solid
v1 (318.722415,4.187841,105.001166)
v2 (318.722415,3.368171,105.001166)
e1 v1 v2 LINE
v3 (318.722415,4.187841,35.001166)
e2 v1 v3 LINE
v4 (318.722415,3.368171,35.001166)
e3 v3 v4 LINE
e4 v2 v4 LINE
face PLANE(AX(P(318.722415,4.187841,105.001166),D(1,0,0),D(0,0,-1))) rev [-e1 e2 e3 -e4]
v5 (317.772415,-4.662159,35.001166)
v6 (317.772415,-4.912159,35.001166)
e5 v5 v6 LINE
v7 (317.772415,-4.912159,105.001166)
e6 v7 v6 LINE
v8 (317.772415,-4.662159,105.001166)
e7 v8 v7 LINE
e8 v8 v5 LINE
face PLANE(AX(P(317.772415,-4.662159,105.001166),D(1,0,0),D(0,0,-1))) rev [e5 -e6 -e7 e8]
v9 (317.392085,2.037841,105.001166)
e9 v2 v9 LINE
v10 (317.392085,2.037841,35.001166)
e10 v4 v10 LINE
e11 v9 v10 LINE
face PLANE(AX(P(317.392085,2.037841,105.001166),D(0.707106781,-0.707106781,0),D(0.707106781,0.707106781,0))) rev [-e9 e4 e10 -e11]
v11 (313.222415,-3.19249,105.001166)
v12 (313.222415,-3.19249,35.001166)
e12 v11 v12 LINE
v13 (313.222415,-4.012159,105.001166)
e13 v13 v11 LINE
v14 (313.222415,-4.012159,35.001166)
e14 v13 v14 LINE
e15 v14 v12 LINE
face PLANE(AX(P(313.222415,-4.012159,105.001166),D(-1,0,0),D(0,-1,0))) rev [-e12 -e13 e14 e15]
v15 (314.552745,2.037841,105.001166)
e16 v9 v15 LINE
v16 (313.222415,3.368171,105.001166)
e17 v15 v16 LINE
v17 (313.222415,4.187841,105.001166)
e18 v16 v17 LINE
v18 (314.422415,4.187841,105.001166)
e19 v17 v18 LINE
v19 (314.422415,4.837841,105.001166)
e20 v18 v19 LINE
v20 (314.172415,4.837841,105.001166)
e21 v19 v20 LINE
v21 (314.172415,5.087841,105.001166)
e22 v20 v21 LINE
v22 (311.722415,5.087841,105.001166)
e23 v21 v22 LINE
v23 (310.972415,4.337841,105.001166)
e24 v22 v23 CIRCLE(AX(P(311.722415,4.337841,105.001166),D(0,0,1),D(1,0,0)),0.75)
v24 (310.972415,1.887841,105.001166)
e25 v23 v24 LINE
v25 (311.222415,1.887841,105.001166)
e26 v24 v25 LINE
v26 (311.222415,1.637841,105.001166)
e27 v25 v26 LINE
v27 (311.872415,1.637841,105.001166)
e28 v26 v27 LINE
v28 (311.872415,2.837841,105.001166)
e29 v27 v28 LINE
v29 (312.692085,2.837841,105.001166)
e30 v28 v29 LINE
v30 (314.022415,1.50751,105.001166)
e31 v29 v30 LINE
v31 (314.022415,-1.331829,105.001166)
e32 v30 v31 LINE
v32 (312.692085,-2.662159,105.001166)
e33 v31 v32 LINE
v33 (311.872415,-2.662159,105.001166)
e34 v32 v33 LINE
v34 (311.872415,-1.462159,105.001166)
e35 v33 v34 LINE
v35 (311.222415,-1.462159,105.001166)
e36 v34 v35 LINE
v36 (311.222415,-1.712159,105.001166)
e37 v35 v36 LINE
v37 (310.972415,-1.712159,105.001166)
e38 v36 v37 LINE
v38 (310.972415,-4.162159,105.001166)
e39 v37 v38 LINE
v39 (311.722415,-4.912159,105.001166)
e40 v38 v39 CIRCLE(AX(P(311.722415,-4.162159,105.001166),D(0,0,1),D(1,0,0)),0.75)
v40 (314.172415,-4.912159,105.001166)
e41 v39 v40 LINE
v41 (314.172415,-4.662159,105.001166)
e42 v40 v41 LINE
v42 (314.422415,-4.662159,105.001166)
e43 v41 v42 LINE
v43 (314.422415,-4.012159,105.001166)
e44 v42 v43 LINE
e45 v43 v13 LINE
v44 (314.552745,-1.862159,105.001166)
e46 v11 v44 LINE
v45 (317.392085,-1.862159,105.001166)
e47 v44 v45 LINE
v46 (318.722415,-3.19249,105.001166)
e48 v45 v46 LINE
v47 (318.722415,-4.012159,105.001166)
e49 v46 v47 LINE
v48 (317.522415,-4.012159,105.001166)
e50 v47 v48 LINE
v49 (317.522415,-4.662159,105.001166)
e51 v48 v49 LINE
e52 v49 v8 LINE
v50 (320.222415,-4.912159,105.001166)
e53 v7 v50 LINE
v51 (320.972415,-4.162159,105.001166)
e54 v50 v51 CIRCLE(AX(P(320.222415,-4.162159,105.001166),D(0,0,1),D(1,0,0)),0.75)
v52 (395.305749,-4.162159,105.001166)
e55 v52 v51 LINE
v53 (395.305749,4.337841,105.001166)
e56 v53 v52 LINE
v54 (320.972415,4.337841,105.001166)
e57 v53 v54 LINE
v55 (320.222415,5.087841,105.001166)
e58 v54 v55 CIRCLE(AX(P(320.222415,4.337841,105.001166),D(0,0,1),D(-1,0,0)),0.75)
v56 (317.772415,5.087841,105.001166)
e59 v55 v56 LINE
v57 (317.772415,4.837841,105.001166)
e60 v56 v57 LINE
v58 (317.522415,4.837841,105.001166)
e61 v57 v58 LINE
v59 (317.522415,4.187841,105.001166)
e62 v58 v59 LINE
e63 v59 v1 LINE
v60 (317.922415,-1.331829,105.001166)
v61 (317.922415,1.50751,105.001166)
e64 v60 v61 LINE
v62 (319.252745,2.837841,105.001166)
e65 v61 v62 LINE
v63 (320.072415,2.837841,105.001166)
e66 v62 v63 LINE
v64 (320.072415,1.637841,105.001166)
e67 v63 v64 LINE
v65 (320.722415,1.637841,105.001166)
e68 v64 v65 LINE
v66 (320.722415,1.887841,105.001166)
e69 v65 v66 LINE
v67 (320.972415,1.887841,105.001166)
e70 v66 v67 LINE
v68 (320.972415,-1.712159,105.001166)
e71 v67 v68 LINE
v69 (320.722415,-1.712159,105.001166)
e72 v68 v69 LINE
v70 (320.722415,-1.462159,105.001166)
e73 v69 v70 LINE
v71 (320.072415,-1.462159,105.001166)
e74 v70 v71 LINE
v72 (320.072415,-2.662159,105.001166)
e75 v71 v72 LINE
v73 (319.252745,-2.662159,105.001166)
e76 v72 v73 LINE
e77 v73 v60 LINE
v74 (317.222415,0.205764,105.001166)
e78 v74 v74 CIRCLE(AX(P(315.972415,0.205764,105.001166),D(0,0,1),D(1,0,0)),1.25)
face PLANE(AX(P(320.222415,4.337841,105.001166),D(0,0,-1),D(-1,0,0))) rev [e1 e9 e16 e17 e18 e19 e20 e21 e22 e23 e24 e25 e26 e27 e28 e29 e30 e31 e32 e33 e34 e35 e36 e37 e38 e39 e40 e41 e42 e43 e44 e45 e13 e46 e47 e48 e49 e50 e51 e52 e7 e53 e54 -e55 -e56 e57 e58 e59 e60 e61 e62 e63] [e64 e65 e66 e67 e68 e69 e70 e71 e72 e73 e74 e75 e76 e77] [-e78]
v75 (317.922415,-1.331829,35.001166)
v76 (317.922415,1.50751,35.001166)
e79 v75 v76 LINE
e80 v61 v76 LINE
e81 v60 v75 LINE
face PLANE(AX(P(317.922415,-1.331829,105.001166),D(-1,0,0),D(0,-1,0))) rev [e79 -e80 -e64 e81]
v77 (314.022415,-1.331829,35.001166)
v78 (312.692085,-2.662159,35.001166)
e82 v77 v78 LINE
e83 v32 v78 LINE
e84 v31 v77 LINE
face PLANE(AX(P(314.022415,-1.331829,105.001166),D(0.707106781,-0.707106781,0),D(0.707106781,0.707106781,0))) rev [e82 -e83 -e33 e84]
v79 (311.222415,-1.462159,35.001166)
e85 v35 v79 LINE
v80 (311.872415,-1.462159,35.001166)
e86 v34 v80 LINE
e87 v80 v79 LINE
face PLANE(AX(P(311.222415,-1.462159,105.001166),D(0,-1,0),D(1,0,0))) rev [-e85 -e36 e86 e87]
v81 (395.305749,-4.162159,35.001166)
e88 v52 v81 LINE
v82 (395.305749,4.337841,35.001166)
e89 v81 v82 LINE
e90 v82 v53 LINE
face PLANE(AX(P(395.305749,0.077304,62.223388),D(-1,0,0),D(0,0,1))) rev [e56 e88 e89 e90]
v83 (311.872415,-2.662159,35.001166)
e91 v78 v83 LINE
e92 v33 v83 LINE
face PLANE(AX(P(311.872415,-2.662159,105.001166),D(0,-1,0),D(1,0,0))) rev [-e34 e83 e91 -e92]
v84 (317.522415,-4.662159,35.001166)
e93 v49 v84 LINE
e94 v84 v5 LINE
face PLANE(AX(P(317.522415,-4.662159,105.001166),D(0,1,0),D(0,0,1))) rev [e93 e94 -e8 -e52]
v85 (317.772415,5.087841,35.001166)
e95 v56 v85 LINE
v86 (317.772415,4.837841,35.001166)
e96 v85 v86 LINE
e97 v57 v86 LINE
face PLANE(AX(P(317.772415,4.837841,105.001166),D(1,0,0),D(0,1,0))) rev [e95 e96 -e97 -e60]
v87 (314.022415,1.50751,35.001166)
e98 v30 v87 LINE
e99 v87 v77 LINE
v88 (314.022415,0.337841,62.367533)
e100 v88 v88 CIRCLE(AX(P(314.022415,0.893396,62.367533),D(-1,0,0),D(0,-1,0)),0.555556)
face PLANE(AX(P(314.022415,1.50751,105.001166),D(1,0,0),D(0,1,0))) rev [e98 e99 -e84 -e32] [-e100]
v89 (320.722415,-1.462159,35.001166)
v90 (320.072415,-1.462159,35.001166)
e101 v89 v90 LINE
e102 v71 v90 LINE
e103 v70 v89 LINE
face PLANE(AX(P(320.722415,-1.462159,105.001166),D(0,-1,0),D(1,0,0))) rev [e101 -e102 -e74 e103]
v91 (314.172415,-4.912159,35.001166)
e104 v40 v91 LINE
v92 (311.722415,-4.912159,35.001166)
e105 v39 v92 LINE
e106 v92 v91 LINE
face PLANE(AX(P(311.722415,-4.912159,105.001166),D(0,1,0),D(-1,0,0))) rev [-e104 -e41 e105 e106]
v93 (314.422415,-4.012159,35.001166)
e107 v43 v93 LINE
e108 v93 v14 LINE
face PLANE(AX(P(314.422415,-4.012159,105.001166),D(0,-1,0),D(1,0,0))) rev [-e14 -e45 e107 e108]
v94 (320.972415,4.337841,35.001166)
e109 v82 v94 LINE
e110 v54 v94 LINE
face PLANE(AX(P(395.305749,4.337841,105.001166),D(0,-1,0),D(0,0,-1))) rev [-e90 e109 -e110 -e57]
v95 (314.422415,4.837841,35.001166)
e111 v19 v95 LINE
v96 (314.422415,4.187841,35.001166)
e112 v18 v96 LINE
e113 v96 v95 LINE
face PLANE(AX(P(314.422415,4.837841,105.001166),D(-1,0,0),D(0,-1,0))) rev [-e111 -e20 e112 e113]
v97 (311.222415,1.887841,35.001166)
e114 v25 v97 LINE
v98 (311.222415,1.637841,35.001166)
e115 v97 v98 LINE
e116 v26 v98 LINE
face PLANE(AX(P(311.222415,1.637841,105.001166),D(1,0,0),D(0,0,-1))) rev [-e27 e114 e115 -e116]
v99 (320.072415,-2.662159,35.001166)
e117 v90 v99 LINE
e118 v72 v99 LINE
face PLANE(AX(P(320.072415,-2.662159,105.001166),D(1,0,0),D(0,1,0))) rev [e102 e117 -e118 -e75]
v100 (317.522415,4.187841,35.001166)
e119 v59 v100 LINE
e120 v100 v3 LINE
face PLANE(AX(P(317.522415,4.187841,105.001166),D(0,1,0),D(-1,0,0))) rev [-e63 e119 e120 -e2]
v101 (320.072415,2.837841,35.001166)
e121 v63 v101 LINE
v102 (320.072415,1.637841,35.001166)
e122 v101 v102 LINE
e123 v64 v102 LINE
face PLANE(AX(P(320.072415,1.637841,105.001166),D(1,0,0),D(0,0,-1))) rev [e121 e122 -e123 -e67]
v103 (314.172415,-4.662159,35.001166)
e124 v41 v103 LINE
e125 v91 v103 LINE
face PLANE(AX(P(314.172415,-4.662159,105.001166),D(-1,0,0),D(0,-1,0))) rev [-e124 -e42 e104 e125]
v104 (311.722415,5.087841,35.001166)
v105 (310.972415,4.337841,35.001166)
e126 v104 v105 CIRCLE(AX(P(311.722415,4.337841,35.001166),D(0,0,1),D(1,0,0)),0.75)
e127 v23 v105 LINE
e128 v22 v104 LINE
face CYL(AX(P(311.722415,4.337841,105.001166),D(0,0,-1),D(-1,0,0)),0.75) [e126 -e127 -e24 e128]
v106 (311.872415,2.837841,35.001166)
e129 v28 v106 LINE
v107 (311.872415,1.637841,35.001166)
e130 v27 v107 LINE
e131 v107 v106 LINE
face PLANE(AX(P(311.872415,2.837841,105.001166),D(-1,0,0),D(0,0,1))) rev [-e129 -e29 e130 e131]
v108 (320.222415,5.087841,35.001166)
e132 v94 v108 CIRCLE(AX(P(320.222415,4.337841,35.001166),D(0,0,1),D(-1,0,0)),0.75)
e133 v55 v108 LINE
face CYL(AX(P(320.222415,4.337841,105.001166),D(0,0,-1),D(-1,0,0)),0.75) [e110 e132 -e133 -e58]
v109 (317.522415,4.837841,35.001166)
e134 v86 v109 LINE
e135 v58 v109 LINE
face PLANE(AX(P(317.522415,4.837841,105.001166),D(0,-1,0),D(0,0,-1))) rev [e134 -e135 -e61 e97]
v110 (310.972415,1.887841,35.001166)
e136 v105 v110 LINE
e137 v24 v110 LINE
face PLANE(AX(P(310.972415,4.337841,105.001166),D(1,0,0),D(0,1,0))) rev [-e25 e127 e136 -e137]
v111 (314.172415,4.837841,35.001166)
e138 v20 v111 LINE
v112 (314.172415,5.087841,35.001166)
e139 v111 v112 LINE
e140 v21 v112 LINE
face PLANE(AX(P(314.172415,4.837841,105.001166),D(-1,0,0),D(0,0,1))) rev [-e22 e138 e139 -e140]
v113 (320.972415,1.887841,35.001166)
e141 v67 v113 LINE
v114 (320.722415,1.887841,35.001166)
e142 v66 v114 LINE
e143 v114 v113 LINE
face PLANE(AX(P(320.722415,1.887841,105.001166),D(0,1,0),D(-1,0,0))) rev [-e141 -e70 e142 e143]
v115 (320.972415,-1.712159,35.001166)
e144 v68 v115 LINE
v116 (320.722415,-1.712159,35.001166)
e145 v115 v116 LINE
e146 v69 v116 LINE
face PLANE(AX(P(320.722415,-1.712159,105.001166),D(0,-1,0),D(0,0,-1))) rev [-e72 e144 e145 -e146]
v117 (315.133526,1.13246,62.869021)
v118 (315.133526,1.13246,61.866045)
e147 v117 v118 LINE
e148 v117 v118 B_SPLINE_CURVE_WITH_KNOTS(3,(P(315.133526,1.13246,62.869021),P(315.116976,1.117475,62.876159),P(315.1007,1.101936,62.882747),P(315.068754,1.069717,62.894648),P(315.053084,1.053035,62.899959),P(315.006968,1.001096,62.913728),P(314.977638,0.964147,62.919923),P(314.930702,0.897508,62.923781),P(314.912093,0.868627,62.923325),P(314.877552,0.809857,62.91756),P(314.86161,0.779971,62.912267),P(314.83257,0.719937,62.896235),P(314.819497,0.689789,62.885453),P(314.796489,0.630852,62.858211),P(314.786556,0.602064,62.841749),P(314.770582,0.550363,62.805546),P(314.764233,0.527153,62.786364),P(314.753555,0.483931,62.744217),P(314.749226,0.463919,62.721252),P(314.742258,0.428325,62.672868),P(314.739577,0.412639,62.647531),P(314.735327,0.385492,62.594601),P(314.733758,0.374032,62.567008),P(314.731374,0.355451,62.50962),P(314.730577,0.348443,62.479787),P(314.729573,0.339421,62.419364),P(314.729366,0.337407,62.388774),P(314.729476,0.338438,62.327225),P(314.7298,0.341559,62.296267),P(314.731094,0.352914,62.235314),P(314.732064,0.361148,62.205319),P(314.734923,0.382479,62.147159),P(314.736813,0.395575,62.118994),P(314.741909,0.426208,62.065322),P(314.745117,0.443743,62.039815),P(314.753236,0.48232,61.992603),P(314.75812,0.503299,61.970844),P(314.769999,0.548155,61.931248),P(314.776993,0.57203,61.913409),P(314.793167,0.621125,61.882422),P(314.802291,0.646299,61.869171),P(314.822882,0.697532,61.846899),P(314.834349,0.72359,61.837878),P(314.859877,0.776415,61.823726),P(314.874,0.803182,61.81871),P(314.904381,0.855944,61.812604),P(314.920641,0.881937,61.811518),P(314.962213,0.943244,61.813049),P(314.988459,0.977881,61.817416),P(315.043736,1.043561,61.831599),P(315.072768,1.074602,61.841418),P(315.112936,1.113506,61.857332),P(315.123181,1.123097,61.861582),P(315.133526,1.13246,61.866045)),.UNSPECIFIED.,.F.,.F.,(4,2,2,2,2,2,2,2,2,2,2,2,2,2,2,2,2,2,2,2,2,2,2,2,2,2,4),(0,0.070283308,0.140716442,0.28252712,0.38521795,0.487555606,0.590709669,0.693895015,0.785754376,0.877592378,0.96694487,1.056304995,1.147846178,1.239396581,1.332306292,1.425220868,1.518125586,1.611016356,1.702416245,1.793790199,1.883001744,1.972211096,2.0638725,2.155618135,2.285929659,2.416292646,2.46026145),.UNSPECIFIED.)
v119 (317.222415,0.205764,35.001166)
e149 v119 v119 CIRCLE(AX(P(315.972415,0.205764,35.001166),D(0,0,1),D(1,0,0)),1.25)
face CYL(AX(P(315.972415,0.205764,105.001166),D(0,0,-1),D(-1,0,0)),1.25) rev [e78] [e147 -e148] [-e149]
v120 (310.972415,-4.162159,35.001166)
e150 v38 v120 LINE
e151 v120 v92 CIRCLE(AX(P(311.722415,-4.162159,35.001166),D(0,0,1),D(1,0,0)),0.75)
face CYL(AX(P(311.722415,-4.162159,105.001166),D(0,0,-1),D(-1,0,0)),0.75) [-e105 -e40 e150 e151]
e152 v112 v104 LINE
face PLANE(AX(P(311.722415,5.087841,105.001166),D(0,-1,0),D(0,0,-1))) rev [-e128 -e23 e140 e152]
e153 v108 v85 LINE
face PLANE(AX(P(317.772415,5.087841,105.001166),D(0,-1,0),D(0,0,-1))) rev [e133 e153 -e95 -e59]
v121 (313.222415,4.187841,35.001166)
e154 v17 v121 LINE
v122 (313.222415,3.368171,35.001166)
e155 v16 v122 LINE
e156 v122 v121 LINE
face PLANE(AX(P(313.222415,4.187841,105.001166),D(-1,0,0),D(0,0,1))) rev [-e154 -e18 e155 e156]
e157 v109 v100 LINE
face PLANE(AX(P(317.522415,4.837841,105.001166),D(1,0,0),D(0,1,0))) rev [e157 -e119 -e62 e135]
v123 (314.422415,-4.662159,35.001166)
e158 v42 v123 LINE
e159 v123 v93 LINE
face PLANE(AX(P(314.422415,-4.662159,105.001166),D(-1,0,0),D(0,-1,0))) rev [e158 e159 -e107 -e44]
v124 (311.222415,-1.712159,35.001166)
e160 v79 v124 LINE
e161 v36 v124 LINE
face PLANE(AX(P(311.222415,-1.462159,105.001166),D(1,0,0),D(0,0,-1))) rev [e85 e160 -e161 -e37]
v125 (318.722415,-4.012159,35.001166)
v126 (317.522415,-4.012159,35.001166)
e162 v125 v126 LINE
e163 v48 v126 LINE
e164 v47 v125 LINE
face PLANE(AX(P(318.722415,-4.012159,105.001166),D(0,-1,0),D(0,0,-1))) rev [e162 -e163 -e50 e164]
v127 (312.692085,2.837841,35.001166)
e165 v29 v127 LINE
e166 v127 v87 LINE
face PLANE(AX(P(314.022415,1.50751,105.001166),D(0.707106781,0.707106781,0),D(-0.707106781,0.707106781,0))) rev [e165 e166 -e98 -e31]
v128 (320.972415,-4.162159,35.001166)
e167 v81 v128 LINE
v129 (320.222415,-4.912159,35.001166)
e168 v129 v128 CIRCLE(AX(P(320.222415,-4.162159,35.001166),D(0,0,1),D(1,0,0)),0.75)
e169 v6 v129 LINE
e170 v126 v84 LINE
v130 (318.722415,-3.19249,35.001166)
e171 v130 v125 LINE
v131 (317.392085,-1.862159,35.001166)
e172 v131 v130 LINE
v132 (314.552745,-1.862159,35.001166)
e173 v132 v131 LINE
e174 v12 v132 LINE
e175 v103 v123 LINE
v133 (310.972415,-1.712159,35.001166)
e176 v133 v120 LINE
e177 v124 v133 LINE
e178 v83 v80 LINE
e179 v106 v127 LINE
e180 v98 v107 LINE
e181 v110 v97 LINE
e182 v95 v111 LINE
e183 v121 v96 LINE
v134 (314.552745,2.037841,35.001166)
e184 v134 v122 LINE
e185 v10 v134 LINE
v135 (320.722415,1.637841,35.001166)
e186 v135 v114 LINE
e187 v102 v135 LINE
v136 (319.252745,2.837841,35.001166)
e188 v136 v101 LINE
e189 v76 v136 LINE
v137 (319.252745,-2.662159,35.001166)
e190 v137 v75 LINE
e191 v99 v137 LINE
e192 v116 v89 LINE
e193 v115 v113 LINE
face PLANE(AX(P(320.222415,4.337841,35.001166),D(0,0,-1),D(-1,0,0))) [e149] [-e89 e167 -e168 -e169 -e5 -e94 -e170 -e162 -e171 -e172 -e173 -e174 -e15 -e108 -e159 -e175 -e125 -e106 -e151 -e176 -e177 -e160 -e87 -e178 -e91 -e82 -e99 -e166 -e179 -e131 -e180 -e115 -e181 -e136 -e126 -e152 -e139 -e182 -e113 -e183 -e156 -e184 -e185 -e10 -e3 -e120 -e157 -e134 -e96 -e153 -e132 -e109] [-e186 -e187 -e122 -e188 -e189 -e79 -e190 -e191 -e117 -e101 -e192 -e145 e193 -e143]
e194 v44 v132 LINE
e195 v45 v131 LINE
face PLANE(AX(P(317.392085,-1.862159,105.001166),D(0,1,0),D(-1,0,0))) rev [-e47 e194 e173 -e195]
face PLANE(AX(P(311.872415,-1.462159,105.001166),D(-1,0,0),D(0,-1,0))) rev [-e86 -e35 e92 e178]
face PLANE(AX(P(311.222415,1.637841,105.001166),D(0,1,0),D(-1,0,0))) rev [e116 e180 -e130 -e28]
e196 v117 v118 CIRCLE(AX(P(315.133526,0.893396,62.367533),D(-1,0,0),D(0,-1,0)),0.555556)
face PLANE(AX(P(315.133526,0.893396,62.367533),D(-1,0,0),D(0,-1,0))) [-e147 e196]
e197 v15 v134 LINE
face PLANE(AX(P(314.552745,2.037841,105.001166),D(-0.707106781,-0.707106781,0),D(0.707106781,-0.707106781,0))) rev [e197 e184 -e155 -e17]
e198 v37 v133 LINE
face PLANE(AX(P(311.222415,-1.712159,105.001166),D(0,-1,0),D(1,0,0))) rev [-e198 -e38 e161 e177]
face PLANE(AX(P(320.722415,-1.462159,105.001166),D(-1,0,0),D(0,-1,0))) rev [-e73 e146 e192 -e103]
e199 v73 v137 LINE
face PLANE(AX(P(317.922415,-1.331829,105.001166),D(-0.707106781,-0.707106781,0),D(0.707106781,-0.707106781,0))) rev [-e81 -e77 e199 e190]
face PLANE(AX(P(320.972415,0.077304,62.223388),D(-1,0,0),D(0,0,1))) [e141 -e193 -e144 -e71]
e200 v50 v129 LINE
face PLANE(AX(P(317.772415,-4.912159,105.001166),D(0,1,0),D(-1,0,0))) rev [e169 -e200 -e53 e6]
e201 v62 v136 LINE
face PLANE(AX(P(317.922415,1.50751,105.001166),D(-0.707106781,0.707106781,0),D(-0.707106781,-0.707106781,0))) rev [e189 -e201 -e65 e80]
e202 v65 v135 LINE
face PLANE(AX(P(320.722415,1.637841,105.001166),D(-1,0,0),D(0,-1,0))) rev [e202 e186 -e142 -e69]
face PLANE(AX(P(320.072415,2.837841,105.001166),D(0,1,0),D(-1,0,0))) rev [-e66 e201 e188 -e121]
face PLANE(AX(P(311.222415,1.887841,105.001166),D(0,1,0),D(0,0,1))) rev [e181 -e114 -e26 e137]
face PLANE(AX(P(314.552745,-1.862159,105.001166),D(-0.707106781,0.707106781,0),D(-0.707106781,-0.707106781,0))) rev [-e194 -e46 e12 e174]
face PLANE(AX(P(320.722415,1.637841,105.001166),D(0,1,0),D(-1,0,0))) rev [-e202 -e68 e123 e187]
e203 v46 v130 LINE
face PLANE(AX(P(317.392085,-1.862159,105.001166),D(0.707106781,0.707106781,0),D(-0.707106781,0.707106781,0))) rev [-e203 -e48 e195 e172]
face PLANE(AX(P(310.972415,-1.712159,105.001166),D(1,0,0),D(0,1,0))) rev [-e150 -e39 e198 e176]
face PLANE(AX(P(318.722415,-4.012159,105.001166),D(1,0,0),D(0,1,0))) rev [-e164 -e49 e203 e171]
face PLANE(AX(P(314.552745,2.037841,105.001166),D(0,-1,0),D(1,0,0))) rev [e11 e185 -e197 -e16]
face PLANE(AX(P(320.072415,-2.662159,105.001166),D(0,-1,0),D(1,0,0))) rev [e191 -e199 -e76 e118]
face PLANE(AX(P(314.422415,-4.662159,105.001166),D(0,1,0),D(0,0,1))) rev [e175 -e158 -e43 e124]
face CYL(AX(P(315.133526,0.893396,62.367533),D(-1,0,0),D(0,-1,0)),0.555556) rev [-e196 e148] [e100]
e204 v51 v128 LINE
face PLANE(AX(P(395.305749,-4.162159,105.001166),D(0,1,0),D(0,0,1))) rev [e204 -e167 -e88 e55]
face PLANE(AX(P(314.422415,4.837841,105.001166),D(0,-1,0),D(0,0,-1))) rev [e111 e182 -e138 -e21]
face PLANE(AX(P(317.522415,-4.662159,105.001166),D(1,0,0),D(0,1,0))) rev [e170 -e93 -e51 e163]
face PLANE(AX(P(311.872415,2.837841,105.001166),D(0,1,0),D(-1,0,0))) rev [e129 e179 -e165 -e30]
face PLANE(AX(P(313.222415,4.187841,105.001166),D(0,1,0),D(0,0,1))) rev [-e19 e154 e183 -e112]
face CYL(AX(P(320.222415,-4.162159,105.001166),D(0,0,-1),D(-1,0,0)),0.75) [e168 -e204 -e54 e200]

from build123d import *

# Parameters (mm, degrees)
SKETCH1_R           = 2.5
BOSS_EXTRUDE1_DEPTH = 140
SCALE_2_SCALE       = 3
SCALE_3_SCALE       = 6
SCALE_5_SCALE       = 2
SCALE_6_SCALE       = 0.25
SCALE_7_SCALE       = 0.125
SCALE_8_SCALE       = 0.25
SCALE_9_SCALE       = 4
SCALE_10_SCALE      = 4
OTHER_START         = -17.55
OTHER_1_OUTLINE_R   = 5
OTHER_1_DEPTH       = 10
SKETCH_11_W         = 630
SKETCH_11_H         = 76.5
EXTRUDE_1_DEPTH     = 669
SCALE_11_SCALE      = 0.111111111


# Read off the part's stored shape, not the designer's step: 孔1
with BuildPart() as part:
    # Sketch1 → Boss-Extrude1 (new body)
    with BuildSketch(Plane.XY):
        with BuildLine():
            Line((2.839339828, 3.9), (5.5, 6.560660172))
            Line((5.5, 6.560660172), (5.5, 8.2))
            Line((5.5, 8.2), (3.1, 8.2))
            Line((3.1, 8.2), (3.1, 9.5))
            Line((3.1, 9.5), (3.6, 9.5))
            Line((3.6, 9.5), (3.6, 10))
            Line((3.6, 10), (8.5, 10))
            ThreePointArc((8.5, 10), (9.560660172, 9.560660172), (10, 8.5))
            Line((10, 8.5), (10, 3.6))
            Line((10, 3.6), (9.5, 3.6))
            Line((9.5, 3.6), (9.5, 3.1))
            Line((9.5, 3.1), (8.2, 3.1))
            Line((8.2, 3.1), (8.2, 5.5))
            Line((8.2, 5.5), (6.560660172, 5.5))
            Line((6.560660172, 5.5), (3.9, 2.839339828))
            Line((3.9, 2.839339828), (3.9, -2.839339828))
            Line((3.9, -2.839339828), (6.560660172, -5.5))
            Line((6.560660172, -5.5), (8.2, -5.5))
            Line((8.2, -5.5), (8.2, -3.1))
            Line((8.2, -3.1), (9.5, -3.1))
            Line((9.5, -3.1), (9.5, -3.6))
            Line((9.5, -3.6), (10, -3.6))
            Line((10, -3.6), (10, -8.5))
            ThreePointArc((10, -8.5), (9.560660172, -9.560660172), (8.5, -10))
            Line((8.5, -10), (3.6, -10))
            Line((3.6, -10), (3.6, -9.5))
            Line((3.6, -9.5), (3.1, -9.5))
            Line((3.1, -9.5), (3.1, -8.2))
            Line((3.1, -8.2), (5.5, -8.2))
            Line((5.5, -8.2), (5.5, -6.560660172))
            Line((5.5, -6.560660172), (2.839339828, -3.9))
            Line((2.839339828, -3.9), (-2.839339828, -3.9))
            Line((-2.839339828, -3.9), (-5.5, -6.560660172))
            Line((-5.5, -6.560660172), (-5.5, -8.2))
            Line((-5.5, -8.2), (-3.1, -8.2))
            Line((-3.1, -8.2), (-3.1, -9.5))
            Line((-3.1, -9.5), (-3.6, -9.5))
            Line((-3.6, -9.5), (-3.6, -10))
            Line((-3.6, -10), (-8.5, -10))
            ThreePointArc((-8.5, -10), (-9.560660172, -9.560660172), (-10, -8.5))
            Line((-10, -8.5), (-10, -3.6))
            Line((-10, -3.6), (-9.5, -3.6))
            Line((-9.5, -3.6), (-9.5, -3.1))
            Line((-9.5, -3.1), (-8.2, -3.1))
            Line((-8.2, -3.1), (-8.2, -5.5))
            Line((-8.2, -5.5), (-6.560660172, -5.5))
            Line((-6.560660172, -5.5), (-3.9, -2.839339828))
            Line((-3.9, -2.839339828), (-3.9, 2.839339828))
            Line((-3.9, 2.839339828), (-6.560660172, 5.5))
            Line((-6.560660172, 5.5), (-8.2, 5.5))
            Line((-8.2, 5.5), (-8.2, 3.1))
            Line((-8.2, 3.1), (-9.5, 3.1))
            Line((-9.5, 3.1), (-9.5, 3.6))
            Line((-9.5, 3.6), (-10, 3.6))
            Line((-10, 3.6), (-10, 8.5))
            ThreePointArc((-10, 8.5), (-9.560660172, 9.560660172), (-8.5, 10))
            Line((-8.5, 10), (-3.6, 10))
            Line((-3.6, 10), (-3.6, 9.5))
            Line((-3.6, 9.5), (-3.1, 9.5))
            Line((-3.1, 9.5), (-3.1, 8.2))
            Line((-3.1, 8.2), (-5.5, 8.2))
            Line((-5.5, 8.2), (-5.5, 6.560660172))
            Line((-5.5, 6.560660172), (-2.839339828, 3.9))
            Line((-2.839339828, 3.9), (2.839339828, 3.9))
        make_face()
        with Locations((0, 0.235847297)):
            Circle(SKETCH1_R, mode=Mode.SUBTRACT)
    extrude(amount=BOSS_EXTRUDE1_DEPTH)


with BuildPart() as part_1:
    # 缩放比例2: scaled about (0, -0.027095247, 70)
    add(part.part.scale(SCALE_2_SCALE).moved(Location((0, 0.054190494, -140))))


with BuildPart() as part_2:
    # 缩放比例3: scaled about (0, -0.027095247, 70)
    add(part_1.part.scale(SCALE_3_SCALE).moved(Location((0, 0.135476235, -350))))


with BuildPart() as part_3:
    # 缩放比例5: scaled about (0, -0.027095249, 70)
    add(part_2.part.scale(SCALE_5_SCALE).moved(Location((0, 0.027095249, -70))))


with BuildPart() as part_4:
    # 缩放比例6: scaled about (0, -0.027095249, 70)
    add(part_3.part.scale(SCALE_6_SCALE).moved(Location((0, -0.020321437, 52.5))))


with BuildPart() as part_5:
    # 缩放比例7: scaled about (0, -0.027095249, 70)
    add(part_4.part.scale(SCALE_7_SCALE).moved(Location((0, -0.023708343, 61.25))))


with BuildPart() as part_6:
    # 缩放比例8: scaled about (0, -0.027095249, 70)
    add(part_5.part.scale(SCALE_8_SCALE).moved(Location((0, -0.020321437, 52.5))))


with BuildPart() as part_7:
    # 缩放比例9: scaled about (0, -0.027095249, 70)
    add(part_6.part.scale(SCALE_9_SCALE).moved(Location((0, 0.081285747, -210))))


with BuildPart() as part_8:
    # 缩放比例10: scaled about (0, -0.027095249, 70)
    add(part_7.part.scale(SCALE_10_SCALE).moved(Location((0, 0.081285747, -210))))

    # 孔1 outline → 孔1 (cut)
    with BuildSketch(Plane.YZ.offset(OTHER_START)):
        with Locations((7.344833538, 1.297306883)):
            Circle(OTHER_1_OUTLINE_R)
    extrude(amount=OTHER_1_DEPTH, mode=Mode.SUBTRACT)

    # 草图11 → 凸台-拉伸1 (add)
    with BuildSketch(Plane(origin=(45, 0, 0), x_dir=(0, 0, -1), z_dir=(1, 0, 0))):
        with Locations((-70, 0.094833365)):
            Rectangle(SKETCH_11_W, SKETCH_11_H)
    extrude(amount=EXTRUDE_1_DEPTH)


with BuildPart() as part_9:
    # 缩放比例11: scaled about (355.468990582, 0.086965488, 70.001302415)
    add(part_8.part.scale(SCALE_11_SCALE).moved(Location((315.972436073, 0.077302656, 62.223379924))))


solid = part_9.part
